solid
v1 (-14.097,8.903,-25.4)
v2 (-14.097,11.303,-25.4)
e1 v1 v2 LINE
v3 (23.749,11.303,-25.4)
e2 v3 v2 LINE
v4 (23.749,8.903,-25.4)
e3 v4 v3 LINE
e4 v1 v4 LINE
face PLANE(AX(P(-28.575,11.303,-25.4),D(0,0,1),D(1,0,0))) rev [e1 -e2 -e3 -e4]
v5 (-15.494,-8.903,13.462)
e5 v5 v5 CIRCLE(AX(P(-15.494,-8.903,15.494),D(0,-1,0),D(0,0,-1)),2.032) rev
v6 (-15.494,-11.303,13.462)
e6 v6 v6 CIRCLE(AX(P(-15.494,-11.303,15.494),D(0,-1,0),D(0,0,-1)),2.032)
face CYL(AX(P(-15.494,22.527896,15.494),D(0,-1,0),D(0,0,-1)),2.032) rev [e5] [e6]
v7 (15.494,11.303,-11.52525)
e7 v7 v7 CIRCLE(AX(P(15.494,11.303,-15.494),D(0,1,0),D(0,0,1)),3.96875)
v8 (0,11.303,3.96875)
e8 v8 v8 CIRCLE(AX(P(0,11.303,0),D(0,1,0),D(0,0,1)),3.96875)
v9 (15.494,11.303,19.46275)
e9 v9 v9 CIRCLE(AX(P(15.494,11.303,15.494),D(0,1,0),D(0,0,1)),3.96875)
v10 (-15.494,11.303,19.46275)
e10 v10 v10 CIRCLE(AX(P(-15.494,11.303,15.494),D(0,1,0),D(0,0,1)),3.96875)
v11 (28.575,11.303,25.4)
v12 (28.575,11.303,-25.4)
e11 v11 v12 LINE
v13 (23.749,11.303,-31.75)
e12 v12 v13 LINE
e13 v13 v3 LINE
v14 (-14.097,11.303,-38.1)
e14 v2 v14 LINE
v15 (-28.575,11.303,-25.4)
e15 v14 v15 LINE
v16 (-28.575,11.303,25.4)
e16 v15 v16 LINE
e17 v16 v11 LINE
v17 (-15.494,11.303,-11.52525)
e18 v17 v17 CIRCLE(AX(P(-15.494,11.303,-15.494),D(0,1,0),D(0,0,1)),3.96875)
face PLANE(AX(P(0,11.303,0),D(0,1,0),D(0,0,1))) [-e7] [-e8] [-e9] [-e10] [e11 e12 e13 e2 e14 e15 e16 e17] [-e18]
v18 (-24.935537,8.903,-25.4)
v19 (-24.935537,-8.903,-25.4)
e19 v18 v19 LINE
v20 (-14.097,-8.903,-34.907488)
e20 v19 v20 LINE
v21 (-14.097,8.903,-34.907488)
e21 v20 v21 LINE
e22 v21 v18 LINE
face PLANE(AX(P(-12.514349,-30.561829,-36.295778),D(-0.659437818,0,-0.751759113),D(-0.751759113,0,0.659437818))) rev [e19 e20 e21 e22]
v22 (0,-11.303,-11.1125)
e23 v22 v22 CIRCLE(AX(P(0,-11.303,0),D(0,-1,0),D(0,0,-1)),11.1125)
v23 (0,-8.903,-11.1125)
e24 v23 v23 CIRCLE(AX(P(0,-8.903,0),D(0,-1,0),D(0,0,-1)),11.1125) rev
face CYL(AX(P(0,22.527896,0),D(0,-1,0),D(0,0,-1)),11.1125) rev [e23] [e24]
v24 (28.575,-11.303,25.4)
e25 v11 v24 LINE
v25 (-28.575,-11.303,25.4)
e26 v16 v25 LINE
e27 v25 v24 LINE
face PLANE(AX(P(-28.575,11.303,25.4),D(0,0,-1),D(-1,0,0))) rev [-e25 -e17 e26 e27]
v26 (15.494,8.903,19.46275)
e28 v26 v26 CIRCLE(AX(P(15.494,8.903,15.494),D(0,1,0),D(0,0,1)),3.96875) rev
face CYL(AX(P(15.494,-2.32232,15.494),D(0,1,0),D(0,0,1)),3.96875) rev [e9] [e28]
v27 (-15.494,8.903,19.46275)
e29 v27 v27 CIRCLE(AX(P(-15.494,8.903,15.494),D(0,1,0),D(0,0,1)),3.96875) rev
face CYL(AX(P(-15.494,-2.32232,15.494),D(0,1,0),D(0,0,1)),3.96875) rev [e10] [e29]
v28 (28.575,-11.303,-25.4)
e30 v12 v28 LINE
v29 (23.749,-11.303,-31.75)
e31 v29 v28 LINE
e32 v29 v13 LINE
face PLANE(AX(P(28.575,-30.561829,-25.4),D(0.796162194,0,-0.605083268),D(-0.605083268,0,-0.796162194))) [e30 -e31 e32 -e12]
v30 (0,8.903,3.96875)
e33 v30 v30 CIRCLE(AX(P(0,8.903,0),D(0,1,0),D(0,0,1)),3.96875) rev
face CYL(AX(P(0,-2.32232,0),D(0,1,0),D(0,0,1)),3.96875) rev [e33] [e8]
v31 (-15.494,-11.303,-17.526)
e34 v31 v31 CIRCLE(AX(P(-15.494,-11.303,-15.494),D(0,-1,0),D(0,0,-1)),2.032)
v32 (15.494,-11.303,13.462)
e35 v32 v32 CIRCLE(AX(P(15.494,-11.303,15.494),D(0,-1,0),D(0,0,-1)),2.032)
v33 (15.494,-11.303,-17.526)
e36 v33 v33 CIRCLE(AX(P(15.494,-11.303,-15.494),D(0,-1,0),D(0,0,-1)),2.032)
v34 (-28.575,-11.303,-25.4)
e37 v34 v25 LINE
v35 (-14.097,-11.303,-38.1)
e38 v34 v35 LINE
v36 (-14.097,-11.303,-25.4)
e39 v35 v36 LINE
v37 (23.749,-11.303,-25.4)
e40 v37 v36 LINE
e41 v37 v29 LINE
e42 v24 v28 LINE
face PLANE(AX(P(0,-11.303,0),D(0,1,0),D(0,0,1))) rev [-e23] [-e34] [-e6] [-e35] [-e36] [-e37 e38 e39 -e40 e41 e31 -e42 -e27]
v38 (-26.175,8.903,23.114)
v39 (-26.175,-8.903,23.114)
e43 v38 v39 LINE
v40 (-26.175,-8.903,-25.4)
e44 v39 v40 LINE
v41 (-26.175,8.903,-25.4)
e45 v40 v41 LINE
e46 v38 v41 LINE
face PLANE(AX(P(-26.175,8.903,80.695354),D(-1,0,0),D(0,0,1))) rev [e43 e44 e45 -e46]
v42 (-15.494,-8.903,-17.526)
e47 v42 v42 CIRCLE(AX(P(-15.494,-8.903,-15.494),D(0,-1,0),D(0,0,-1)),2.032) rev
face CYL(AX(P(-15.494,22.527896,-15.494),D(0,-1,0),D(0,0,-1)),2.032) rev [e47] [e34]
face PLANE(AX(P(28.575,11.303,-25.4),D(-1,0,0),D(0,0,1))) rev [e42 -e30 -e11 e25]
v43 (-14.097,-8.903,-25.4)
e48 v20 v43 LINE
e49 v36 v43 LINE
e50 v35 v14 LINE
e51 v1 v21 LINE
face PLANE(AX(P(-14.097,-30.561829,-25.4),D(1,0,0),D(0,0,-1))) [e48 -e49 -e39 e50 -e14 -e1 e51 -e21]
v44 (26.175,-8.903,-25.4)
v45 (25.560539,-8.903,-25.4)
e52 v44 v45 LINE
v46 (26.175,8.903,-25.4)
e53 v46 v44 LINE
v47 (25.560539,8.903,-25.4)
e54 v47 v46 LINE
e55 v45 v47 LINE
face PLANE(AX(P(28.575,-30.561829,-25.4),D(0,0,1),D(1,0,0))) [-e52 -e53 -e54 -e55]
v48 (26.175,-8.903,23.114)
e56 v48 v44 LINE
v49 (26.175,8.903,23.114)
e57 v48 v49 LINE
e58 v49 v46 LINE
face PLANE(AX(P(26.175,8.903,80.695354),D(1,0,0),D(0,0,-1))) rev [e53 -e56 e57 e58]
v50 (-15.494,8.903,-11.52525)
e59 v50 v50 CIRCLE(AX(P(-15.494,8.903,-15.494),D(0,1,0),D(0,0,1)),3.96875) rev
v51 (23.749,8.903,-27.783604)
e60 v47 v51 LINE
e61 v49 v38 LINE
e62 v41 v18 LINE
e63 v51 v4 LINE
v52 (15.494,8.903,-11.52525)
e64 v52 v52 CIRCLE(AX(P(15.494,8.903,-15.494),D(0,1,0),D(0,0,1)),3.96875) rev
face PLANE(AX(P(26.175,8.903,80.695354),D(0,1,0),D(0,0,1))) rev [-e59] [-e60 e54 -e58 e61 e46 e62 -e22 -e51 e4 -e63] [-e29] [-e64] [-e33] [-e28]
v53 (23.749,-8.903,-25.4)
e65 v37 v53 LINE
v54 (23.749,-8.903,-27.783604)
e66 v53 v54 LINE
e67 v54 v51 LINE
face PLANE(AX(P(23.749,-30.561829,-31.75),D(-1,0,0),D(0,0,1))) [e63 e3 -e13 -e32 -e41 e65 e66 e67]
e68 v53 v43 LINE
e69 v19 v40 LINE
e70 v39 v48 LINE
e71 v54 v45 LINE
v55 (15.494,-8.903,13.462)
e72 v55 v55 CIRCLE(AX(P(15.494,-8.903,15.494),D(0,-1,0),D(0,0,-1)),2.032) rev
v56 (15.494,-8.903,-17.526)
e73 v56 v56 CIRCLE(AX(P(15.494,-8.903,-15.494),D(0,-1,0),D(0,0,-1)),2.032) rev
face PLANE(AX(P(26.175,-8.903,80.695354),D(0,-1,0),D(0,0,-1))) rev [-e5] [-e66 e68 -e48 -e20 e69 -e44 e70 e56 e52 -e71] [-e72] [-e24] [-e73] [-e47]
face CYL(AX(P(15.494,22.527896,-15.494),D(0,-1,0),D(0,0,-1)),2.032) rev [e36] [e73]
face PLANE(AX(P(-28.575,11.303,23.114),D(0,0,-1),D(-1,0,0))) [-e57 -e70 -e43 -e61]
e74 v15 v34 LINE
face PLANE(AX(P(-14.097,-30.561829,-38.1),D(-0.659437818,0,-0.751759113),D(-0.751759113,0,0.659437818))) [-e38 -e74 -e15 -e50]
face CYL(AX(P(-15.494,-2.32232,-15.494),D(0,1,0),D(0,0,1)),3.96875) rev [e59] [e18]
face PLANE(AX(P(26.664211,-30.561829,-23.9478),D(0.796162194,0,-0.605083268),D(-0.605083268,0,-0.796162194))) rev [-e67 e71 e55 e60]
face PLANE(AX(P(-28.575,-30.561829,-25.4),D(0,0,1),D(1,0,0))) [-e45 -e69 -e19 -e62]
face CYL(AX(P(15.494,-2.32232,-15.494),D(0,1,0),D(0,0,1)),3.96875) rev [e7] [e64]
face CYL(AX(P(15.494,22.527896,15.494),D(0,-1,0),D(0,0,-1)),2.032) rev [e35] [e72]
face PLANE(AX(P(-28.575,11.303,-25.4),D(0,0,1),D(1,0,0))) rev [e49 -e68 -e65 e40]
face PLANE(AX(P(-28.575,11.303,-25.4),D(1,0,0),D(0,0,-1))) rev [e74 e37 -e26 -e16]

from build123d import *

# Parameters (mm, degrees)
SKETCH1_W           = 57.15
SKETCH1_H           = 50.8
BOSS_EXTRUDE1_DEPTH = 11.303
SKETCH2_W           = 52.350000456
SKETCH2_H           = 17.806000456
CUT_EXTRUDE1_DEPTH  = 48.514
SKETCH3_R           = 2.032
SKETCH3_R_2         = 11.1125
CUT_EXTRUDE2_DEPTH  = 2.399999772
SKETCH4_R           = 3.96875
CUT_EXTRUDE3_DEPTH  = 2.399999772
BOSS_EXTRUDE2_REACH = 46.415
SHELL1_START        = -35.538117353
SHELL1_OUTLINE_W    = 14.41756603
SHELL1_OUTLINE_H    = 17.806000456
SHELL1_DEPTH        = 8.538117353
SHELL2_START        = 34.277170944
SHELL2_OUTLINE_W    = 2.993867518
SHELL2_OUTLINE_H    = 17.806000456
SHELL2_DEPTH        = 1.442278976


with BuildPart() as part:
    # Sketch1 → Boss-Extrude1 (new, symmetric)
    with BuildSketch(Plane(origin=(0, 0, 0), x_dir=(1, 0, 0), z_dir=(0, 1, 0))):
        Rectangle(SKETCH1_W, SKETCH1_H)
    extrude(amount=BOSS_EXTRUDE1_DEPTH, both=True)

    # Sketch2 → Cut-Extrude1 (cut)
    with BuildSketch(Plane(origin=(0, 0, -25.4), x_dir=(-1, 0, 0), z_dir=(0, 0, -1))):
        Rectangle(SKETCH2_W, SKETCH2_H)
    extrude(amount=-CUT_EXTRUDE1_DEPTH, mode=Mode.SUBTRACT)

    # Sketch3 → Cut-Extrude2 (cut)
    with BuildSketch(Plane.XZ.offset(11.303)):
        with Locations(Location((-15.494, 15.494, 0), (0, 0, 270))):
            Circle(SKETCH3_R)
        with Locations(Location((15.494, 15.494, 0), (0, 0, 270))):
            Circle(SKETCH3_R)
        with Locations(Location((15.494, -15.494, 0), (0, 0, 270))):
            Circle(SKETCH3_R)
        with Locations(Location((-15.494, -15.494, 0), (0, 0, 270))):
            Circle(SKETCH3_R)
        with Locations(Location((0, 0, 0), (0, 0, 270))):
            Circle(SKETCH3_R_2)
    extrude(amount=-CUT_EXTRUDE2_DEPTH, mode=Mode.SUBTRACT)

    # Sketch4 → Cut-Extrude3 (cut)
    with BuildSketch(Plane(origin=(0, 11.303, 0), x_dir=(1, 0, 0), z_dir=(0, 1, 0))):
        with Locations(Location((-15.494, 15.494, 0), (0, 0, 270))):
            Circle(SKETCH4_R)
        with Locations(Location((15.494, 15.494, 0), (0, 0, 270))):
            Circle(SKETCH4_R)
        with Locations(Location((15.494, -15.494, 0), (0, 0, 270))):
            Circle(SKETCH4_R)
        with Locations(Location((-15.494, -15.494, 0), (0, 0, 270))):
            Circle(SKETCH4_R)
        with Locations(Location((0, 0, 0), (0, 0, 270))):
            Circle(SKETCH4_R)
    extrude(amount=-CUT_EXTRUDE3_DEPTH, mode=Mode.SUBTRACT)

    # Boss-Extrude2: up to this face of the body (flat: up to its plane)
    boss_extrude2_end = Plane(part.part.faces().sort_by_distance((0, -11.303, -24.635358744))[0])
    # Sketch5 → Boss-Extrude2 (add, up to the picked face)
    with BuildSketch(Plane(origin=(0, 11.303, 0), x_dir=(1, 0, 0), z_dir=(0, 1, 0)), mode=Mode.PRIVATE) as boss_extrude2_sk1:
        Polygon((-28.575, 25.4), (-14.097, 25.4), (-14.097, 38.1), align=None)
    boss_extrude2_tool1 = split(extrude(boss_extrude2_sk1.sketch, amount=-BOSS_EXTRUDE2_REACH, mode=Mode.PRIVATE), bisect_by=boss_extrude2_end, keep=Keep.BOTH, mode=Mode.PRIVATE)
    # Sketch5 → Boss-Extrude2 (add, up to the picked face)
    with BuildSketch(Plane(origin=(0, 11.303, 0), x_dir=(1, 0, 0), z_dir=(0, 1, 0)), mode=Mode.PRIVATE) as boss_extrude2_sk2:
        Polygon((28.575, 25.4), (23.749, 25.4), (23.749, 31.75), align=None)
    boss_extrude2_tool2 = split(extrude(boss_extrude2_sk2.sketch, amount=-BOSS_EXTRUDE2_REACH, mode=Mode.PRIVATE), bisect_by=boss_extrude2_end, keep=Keep.BOTH, mode=Mode.PRIVATE)
    add(boss_extrude2_tool1.solids().sort_by(Axis((-18.923, 11.303, -29.633333), (0, -1, 0)))[0])
    add(boss_extrude2_tool2.solids().sort_by(Axis((25.357667, 11.303, -27.516667), (0, -1, 0)))[0])

    # Shell1: read off the stored shape, not the designer's step
    # Shell1 outline → Shell1 (cut)
    with BuildSketch(Plane(origin=(0, 0, 0), x_dir=(0.7517591128712744, 0, -0.6594378183081364), z_dir=(0.6594378183081363, 0, 0.7517591128712744)).offset(SHELL1_START)):
        with Locations((5.21298669, 0)):
            Rectangle(SHELL1_OUTLINE_W, SHELL1_OUTLINE_H)
    extrude(amount=SHELL1_DEPTH, mode=Mode.SUBTRACT)

    # Shell2: read off the stored shape, not the designer's step
    # Shell2 outline → Shell2 (cut)
    with BuildSketch(Plane(origin=(0, 0, 0), x_dir=(0.6050832675335581, 0, 0.7961621941231024), z_dir=(0.7961621941231023, 0, -0.6050832675335583)).offset(SHELL2_START)):
        with Locations((-6.253198947, 0)):
            Rectangle(SHELL2_OUTLINE_W, SHELL2_OUTLINE_H)
    extrude(amount=SHELL2_DEPTH, mode=Mode.SUBTRACT)


solid = part.part
